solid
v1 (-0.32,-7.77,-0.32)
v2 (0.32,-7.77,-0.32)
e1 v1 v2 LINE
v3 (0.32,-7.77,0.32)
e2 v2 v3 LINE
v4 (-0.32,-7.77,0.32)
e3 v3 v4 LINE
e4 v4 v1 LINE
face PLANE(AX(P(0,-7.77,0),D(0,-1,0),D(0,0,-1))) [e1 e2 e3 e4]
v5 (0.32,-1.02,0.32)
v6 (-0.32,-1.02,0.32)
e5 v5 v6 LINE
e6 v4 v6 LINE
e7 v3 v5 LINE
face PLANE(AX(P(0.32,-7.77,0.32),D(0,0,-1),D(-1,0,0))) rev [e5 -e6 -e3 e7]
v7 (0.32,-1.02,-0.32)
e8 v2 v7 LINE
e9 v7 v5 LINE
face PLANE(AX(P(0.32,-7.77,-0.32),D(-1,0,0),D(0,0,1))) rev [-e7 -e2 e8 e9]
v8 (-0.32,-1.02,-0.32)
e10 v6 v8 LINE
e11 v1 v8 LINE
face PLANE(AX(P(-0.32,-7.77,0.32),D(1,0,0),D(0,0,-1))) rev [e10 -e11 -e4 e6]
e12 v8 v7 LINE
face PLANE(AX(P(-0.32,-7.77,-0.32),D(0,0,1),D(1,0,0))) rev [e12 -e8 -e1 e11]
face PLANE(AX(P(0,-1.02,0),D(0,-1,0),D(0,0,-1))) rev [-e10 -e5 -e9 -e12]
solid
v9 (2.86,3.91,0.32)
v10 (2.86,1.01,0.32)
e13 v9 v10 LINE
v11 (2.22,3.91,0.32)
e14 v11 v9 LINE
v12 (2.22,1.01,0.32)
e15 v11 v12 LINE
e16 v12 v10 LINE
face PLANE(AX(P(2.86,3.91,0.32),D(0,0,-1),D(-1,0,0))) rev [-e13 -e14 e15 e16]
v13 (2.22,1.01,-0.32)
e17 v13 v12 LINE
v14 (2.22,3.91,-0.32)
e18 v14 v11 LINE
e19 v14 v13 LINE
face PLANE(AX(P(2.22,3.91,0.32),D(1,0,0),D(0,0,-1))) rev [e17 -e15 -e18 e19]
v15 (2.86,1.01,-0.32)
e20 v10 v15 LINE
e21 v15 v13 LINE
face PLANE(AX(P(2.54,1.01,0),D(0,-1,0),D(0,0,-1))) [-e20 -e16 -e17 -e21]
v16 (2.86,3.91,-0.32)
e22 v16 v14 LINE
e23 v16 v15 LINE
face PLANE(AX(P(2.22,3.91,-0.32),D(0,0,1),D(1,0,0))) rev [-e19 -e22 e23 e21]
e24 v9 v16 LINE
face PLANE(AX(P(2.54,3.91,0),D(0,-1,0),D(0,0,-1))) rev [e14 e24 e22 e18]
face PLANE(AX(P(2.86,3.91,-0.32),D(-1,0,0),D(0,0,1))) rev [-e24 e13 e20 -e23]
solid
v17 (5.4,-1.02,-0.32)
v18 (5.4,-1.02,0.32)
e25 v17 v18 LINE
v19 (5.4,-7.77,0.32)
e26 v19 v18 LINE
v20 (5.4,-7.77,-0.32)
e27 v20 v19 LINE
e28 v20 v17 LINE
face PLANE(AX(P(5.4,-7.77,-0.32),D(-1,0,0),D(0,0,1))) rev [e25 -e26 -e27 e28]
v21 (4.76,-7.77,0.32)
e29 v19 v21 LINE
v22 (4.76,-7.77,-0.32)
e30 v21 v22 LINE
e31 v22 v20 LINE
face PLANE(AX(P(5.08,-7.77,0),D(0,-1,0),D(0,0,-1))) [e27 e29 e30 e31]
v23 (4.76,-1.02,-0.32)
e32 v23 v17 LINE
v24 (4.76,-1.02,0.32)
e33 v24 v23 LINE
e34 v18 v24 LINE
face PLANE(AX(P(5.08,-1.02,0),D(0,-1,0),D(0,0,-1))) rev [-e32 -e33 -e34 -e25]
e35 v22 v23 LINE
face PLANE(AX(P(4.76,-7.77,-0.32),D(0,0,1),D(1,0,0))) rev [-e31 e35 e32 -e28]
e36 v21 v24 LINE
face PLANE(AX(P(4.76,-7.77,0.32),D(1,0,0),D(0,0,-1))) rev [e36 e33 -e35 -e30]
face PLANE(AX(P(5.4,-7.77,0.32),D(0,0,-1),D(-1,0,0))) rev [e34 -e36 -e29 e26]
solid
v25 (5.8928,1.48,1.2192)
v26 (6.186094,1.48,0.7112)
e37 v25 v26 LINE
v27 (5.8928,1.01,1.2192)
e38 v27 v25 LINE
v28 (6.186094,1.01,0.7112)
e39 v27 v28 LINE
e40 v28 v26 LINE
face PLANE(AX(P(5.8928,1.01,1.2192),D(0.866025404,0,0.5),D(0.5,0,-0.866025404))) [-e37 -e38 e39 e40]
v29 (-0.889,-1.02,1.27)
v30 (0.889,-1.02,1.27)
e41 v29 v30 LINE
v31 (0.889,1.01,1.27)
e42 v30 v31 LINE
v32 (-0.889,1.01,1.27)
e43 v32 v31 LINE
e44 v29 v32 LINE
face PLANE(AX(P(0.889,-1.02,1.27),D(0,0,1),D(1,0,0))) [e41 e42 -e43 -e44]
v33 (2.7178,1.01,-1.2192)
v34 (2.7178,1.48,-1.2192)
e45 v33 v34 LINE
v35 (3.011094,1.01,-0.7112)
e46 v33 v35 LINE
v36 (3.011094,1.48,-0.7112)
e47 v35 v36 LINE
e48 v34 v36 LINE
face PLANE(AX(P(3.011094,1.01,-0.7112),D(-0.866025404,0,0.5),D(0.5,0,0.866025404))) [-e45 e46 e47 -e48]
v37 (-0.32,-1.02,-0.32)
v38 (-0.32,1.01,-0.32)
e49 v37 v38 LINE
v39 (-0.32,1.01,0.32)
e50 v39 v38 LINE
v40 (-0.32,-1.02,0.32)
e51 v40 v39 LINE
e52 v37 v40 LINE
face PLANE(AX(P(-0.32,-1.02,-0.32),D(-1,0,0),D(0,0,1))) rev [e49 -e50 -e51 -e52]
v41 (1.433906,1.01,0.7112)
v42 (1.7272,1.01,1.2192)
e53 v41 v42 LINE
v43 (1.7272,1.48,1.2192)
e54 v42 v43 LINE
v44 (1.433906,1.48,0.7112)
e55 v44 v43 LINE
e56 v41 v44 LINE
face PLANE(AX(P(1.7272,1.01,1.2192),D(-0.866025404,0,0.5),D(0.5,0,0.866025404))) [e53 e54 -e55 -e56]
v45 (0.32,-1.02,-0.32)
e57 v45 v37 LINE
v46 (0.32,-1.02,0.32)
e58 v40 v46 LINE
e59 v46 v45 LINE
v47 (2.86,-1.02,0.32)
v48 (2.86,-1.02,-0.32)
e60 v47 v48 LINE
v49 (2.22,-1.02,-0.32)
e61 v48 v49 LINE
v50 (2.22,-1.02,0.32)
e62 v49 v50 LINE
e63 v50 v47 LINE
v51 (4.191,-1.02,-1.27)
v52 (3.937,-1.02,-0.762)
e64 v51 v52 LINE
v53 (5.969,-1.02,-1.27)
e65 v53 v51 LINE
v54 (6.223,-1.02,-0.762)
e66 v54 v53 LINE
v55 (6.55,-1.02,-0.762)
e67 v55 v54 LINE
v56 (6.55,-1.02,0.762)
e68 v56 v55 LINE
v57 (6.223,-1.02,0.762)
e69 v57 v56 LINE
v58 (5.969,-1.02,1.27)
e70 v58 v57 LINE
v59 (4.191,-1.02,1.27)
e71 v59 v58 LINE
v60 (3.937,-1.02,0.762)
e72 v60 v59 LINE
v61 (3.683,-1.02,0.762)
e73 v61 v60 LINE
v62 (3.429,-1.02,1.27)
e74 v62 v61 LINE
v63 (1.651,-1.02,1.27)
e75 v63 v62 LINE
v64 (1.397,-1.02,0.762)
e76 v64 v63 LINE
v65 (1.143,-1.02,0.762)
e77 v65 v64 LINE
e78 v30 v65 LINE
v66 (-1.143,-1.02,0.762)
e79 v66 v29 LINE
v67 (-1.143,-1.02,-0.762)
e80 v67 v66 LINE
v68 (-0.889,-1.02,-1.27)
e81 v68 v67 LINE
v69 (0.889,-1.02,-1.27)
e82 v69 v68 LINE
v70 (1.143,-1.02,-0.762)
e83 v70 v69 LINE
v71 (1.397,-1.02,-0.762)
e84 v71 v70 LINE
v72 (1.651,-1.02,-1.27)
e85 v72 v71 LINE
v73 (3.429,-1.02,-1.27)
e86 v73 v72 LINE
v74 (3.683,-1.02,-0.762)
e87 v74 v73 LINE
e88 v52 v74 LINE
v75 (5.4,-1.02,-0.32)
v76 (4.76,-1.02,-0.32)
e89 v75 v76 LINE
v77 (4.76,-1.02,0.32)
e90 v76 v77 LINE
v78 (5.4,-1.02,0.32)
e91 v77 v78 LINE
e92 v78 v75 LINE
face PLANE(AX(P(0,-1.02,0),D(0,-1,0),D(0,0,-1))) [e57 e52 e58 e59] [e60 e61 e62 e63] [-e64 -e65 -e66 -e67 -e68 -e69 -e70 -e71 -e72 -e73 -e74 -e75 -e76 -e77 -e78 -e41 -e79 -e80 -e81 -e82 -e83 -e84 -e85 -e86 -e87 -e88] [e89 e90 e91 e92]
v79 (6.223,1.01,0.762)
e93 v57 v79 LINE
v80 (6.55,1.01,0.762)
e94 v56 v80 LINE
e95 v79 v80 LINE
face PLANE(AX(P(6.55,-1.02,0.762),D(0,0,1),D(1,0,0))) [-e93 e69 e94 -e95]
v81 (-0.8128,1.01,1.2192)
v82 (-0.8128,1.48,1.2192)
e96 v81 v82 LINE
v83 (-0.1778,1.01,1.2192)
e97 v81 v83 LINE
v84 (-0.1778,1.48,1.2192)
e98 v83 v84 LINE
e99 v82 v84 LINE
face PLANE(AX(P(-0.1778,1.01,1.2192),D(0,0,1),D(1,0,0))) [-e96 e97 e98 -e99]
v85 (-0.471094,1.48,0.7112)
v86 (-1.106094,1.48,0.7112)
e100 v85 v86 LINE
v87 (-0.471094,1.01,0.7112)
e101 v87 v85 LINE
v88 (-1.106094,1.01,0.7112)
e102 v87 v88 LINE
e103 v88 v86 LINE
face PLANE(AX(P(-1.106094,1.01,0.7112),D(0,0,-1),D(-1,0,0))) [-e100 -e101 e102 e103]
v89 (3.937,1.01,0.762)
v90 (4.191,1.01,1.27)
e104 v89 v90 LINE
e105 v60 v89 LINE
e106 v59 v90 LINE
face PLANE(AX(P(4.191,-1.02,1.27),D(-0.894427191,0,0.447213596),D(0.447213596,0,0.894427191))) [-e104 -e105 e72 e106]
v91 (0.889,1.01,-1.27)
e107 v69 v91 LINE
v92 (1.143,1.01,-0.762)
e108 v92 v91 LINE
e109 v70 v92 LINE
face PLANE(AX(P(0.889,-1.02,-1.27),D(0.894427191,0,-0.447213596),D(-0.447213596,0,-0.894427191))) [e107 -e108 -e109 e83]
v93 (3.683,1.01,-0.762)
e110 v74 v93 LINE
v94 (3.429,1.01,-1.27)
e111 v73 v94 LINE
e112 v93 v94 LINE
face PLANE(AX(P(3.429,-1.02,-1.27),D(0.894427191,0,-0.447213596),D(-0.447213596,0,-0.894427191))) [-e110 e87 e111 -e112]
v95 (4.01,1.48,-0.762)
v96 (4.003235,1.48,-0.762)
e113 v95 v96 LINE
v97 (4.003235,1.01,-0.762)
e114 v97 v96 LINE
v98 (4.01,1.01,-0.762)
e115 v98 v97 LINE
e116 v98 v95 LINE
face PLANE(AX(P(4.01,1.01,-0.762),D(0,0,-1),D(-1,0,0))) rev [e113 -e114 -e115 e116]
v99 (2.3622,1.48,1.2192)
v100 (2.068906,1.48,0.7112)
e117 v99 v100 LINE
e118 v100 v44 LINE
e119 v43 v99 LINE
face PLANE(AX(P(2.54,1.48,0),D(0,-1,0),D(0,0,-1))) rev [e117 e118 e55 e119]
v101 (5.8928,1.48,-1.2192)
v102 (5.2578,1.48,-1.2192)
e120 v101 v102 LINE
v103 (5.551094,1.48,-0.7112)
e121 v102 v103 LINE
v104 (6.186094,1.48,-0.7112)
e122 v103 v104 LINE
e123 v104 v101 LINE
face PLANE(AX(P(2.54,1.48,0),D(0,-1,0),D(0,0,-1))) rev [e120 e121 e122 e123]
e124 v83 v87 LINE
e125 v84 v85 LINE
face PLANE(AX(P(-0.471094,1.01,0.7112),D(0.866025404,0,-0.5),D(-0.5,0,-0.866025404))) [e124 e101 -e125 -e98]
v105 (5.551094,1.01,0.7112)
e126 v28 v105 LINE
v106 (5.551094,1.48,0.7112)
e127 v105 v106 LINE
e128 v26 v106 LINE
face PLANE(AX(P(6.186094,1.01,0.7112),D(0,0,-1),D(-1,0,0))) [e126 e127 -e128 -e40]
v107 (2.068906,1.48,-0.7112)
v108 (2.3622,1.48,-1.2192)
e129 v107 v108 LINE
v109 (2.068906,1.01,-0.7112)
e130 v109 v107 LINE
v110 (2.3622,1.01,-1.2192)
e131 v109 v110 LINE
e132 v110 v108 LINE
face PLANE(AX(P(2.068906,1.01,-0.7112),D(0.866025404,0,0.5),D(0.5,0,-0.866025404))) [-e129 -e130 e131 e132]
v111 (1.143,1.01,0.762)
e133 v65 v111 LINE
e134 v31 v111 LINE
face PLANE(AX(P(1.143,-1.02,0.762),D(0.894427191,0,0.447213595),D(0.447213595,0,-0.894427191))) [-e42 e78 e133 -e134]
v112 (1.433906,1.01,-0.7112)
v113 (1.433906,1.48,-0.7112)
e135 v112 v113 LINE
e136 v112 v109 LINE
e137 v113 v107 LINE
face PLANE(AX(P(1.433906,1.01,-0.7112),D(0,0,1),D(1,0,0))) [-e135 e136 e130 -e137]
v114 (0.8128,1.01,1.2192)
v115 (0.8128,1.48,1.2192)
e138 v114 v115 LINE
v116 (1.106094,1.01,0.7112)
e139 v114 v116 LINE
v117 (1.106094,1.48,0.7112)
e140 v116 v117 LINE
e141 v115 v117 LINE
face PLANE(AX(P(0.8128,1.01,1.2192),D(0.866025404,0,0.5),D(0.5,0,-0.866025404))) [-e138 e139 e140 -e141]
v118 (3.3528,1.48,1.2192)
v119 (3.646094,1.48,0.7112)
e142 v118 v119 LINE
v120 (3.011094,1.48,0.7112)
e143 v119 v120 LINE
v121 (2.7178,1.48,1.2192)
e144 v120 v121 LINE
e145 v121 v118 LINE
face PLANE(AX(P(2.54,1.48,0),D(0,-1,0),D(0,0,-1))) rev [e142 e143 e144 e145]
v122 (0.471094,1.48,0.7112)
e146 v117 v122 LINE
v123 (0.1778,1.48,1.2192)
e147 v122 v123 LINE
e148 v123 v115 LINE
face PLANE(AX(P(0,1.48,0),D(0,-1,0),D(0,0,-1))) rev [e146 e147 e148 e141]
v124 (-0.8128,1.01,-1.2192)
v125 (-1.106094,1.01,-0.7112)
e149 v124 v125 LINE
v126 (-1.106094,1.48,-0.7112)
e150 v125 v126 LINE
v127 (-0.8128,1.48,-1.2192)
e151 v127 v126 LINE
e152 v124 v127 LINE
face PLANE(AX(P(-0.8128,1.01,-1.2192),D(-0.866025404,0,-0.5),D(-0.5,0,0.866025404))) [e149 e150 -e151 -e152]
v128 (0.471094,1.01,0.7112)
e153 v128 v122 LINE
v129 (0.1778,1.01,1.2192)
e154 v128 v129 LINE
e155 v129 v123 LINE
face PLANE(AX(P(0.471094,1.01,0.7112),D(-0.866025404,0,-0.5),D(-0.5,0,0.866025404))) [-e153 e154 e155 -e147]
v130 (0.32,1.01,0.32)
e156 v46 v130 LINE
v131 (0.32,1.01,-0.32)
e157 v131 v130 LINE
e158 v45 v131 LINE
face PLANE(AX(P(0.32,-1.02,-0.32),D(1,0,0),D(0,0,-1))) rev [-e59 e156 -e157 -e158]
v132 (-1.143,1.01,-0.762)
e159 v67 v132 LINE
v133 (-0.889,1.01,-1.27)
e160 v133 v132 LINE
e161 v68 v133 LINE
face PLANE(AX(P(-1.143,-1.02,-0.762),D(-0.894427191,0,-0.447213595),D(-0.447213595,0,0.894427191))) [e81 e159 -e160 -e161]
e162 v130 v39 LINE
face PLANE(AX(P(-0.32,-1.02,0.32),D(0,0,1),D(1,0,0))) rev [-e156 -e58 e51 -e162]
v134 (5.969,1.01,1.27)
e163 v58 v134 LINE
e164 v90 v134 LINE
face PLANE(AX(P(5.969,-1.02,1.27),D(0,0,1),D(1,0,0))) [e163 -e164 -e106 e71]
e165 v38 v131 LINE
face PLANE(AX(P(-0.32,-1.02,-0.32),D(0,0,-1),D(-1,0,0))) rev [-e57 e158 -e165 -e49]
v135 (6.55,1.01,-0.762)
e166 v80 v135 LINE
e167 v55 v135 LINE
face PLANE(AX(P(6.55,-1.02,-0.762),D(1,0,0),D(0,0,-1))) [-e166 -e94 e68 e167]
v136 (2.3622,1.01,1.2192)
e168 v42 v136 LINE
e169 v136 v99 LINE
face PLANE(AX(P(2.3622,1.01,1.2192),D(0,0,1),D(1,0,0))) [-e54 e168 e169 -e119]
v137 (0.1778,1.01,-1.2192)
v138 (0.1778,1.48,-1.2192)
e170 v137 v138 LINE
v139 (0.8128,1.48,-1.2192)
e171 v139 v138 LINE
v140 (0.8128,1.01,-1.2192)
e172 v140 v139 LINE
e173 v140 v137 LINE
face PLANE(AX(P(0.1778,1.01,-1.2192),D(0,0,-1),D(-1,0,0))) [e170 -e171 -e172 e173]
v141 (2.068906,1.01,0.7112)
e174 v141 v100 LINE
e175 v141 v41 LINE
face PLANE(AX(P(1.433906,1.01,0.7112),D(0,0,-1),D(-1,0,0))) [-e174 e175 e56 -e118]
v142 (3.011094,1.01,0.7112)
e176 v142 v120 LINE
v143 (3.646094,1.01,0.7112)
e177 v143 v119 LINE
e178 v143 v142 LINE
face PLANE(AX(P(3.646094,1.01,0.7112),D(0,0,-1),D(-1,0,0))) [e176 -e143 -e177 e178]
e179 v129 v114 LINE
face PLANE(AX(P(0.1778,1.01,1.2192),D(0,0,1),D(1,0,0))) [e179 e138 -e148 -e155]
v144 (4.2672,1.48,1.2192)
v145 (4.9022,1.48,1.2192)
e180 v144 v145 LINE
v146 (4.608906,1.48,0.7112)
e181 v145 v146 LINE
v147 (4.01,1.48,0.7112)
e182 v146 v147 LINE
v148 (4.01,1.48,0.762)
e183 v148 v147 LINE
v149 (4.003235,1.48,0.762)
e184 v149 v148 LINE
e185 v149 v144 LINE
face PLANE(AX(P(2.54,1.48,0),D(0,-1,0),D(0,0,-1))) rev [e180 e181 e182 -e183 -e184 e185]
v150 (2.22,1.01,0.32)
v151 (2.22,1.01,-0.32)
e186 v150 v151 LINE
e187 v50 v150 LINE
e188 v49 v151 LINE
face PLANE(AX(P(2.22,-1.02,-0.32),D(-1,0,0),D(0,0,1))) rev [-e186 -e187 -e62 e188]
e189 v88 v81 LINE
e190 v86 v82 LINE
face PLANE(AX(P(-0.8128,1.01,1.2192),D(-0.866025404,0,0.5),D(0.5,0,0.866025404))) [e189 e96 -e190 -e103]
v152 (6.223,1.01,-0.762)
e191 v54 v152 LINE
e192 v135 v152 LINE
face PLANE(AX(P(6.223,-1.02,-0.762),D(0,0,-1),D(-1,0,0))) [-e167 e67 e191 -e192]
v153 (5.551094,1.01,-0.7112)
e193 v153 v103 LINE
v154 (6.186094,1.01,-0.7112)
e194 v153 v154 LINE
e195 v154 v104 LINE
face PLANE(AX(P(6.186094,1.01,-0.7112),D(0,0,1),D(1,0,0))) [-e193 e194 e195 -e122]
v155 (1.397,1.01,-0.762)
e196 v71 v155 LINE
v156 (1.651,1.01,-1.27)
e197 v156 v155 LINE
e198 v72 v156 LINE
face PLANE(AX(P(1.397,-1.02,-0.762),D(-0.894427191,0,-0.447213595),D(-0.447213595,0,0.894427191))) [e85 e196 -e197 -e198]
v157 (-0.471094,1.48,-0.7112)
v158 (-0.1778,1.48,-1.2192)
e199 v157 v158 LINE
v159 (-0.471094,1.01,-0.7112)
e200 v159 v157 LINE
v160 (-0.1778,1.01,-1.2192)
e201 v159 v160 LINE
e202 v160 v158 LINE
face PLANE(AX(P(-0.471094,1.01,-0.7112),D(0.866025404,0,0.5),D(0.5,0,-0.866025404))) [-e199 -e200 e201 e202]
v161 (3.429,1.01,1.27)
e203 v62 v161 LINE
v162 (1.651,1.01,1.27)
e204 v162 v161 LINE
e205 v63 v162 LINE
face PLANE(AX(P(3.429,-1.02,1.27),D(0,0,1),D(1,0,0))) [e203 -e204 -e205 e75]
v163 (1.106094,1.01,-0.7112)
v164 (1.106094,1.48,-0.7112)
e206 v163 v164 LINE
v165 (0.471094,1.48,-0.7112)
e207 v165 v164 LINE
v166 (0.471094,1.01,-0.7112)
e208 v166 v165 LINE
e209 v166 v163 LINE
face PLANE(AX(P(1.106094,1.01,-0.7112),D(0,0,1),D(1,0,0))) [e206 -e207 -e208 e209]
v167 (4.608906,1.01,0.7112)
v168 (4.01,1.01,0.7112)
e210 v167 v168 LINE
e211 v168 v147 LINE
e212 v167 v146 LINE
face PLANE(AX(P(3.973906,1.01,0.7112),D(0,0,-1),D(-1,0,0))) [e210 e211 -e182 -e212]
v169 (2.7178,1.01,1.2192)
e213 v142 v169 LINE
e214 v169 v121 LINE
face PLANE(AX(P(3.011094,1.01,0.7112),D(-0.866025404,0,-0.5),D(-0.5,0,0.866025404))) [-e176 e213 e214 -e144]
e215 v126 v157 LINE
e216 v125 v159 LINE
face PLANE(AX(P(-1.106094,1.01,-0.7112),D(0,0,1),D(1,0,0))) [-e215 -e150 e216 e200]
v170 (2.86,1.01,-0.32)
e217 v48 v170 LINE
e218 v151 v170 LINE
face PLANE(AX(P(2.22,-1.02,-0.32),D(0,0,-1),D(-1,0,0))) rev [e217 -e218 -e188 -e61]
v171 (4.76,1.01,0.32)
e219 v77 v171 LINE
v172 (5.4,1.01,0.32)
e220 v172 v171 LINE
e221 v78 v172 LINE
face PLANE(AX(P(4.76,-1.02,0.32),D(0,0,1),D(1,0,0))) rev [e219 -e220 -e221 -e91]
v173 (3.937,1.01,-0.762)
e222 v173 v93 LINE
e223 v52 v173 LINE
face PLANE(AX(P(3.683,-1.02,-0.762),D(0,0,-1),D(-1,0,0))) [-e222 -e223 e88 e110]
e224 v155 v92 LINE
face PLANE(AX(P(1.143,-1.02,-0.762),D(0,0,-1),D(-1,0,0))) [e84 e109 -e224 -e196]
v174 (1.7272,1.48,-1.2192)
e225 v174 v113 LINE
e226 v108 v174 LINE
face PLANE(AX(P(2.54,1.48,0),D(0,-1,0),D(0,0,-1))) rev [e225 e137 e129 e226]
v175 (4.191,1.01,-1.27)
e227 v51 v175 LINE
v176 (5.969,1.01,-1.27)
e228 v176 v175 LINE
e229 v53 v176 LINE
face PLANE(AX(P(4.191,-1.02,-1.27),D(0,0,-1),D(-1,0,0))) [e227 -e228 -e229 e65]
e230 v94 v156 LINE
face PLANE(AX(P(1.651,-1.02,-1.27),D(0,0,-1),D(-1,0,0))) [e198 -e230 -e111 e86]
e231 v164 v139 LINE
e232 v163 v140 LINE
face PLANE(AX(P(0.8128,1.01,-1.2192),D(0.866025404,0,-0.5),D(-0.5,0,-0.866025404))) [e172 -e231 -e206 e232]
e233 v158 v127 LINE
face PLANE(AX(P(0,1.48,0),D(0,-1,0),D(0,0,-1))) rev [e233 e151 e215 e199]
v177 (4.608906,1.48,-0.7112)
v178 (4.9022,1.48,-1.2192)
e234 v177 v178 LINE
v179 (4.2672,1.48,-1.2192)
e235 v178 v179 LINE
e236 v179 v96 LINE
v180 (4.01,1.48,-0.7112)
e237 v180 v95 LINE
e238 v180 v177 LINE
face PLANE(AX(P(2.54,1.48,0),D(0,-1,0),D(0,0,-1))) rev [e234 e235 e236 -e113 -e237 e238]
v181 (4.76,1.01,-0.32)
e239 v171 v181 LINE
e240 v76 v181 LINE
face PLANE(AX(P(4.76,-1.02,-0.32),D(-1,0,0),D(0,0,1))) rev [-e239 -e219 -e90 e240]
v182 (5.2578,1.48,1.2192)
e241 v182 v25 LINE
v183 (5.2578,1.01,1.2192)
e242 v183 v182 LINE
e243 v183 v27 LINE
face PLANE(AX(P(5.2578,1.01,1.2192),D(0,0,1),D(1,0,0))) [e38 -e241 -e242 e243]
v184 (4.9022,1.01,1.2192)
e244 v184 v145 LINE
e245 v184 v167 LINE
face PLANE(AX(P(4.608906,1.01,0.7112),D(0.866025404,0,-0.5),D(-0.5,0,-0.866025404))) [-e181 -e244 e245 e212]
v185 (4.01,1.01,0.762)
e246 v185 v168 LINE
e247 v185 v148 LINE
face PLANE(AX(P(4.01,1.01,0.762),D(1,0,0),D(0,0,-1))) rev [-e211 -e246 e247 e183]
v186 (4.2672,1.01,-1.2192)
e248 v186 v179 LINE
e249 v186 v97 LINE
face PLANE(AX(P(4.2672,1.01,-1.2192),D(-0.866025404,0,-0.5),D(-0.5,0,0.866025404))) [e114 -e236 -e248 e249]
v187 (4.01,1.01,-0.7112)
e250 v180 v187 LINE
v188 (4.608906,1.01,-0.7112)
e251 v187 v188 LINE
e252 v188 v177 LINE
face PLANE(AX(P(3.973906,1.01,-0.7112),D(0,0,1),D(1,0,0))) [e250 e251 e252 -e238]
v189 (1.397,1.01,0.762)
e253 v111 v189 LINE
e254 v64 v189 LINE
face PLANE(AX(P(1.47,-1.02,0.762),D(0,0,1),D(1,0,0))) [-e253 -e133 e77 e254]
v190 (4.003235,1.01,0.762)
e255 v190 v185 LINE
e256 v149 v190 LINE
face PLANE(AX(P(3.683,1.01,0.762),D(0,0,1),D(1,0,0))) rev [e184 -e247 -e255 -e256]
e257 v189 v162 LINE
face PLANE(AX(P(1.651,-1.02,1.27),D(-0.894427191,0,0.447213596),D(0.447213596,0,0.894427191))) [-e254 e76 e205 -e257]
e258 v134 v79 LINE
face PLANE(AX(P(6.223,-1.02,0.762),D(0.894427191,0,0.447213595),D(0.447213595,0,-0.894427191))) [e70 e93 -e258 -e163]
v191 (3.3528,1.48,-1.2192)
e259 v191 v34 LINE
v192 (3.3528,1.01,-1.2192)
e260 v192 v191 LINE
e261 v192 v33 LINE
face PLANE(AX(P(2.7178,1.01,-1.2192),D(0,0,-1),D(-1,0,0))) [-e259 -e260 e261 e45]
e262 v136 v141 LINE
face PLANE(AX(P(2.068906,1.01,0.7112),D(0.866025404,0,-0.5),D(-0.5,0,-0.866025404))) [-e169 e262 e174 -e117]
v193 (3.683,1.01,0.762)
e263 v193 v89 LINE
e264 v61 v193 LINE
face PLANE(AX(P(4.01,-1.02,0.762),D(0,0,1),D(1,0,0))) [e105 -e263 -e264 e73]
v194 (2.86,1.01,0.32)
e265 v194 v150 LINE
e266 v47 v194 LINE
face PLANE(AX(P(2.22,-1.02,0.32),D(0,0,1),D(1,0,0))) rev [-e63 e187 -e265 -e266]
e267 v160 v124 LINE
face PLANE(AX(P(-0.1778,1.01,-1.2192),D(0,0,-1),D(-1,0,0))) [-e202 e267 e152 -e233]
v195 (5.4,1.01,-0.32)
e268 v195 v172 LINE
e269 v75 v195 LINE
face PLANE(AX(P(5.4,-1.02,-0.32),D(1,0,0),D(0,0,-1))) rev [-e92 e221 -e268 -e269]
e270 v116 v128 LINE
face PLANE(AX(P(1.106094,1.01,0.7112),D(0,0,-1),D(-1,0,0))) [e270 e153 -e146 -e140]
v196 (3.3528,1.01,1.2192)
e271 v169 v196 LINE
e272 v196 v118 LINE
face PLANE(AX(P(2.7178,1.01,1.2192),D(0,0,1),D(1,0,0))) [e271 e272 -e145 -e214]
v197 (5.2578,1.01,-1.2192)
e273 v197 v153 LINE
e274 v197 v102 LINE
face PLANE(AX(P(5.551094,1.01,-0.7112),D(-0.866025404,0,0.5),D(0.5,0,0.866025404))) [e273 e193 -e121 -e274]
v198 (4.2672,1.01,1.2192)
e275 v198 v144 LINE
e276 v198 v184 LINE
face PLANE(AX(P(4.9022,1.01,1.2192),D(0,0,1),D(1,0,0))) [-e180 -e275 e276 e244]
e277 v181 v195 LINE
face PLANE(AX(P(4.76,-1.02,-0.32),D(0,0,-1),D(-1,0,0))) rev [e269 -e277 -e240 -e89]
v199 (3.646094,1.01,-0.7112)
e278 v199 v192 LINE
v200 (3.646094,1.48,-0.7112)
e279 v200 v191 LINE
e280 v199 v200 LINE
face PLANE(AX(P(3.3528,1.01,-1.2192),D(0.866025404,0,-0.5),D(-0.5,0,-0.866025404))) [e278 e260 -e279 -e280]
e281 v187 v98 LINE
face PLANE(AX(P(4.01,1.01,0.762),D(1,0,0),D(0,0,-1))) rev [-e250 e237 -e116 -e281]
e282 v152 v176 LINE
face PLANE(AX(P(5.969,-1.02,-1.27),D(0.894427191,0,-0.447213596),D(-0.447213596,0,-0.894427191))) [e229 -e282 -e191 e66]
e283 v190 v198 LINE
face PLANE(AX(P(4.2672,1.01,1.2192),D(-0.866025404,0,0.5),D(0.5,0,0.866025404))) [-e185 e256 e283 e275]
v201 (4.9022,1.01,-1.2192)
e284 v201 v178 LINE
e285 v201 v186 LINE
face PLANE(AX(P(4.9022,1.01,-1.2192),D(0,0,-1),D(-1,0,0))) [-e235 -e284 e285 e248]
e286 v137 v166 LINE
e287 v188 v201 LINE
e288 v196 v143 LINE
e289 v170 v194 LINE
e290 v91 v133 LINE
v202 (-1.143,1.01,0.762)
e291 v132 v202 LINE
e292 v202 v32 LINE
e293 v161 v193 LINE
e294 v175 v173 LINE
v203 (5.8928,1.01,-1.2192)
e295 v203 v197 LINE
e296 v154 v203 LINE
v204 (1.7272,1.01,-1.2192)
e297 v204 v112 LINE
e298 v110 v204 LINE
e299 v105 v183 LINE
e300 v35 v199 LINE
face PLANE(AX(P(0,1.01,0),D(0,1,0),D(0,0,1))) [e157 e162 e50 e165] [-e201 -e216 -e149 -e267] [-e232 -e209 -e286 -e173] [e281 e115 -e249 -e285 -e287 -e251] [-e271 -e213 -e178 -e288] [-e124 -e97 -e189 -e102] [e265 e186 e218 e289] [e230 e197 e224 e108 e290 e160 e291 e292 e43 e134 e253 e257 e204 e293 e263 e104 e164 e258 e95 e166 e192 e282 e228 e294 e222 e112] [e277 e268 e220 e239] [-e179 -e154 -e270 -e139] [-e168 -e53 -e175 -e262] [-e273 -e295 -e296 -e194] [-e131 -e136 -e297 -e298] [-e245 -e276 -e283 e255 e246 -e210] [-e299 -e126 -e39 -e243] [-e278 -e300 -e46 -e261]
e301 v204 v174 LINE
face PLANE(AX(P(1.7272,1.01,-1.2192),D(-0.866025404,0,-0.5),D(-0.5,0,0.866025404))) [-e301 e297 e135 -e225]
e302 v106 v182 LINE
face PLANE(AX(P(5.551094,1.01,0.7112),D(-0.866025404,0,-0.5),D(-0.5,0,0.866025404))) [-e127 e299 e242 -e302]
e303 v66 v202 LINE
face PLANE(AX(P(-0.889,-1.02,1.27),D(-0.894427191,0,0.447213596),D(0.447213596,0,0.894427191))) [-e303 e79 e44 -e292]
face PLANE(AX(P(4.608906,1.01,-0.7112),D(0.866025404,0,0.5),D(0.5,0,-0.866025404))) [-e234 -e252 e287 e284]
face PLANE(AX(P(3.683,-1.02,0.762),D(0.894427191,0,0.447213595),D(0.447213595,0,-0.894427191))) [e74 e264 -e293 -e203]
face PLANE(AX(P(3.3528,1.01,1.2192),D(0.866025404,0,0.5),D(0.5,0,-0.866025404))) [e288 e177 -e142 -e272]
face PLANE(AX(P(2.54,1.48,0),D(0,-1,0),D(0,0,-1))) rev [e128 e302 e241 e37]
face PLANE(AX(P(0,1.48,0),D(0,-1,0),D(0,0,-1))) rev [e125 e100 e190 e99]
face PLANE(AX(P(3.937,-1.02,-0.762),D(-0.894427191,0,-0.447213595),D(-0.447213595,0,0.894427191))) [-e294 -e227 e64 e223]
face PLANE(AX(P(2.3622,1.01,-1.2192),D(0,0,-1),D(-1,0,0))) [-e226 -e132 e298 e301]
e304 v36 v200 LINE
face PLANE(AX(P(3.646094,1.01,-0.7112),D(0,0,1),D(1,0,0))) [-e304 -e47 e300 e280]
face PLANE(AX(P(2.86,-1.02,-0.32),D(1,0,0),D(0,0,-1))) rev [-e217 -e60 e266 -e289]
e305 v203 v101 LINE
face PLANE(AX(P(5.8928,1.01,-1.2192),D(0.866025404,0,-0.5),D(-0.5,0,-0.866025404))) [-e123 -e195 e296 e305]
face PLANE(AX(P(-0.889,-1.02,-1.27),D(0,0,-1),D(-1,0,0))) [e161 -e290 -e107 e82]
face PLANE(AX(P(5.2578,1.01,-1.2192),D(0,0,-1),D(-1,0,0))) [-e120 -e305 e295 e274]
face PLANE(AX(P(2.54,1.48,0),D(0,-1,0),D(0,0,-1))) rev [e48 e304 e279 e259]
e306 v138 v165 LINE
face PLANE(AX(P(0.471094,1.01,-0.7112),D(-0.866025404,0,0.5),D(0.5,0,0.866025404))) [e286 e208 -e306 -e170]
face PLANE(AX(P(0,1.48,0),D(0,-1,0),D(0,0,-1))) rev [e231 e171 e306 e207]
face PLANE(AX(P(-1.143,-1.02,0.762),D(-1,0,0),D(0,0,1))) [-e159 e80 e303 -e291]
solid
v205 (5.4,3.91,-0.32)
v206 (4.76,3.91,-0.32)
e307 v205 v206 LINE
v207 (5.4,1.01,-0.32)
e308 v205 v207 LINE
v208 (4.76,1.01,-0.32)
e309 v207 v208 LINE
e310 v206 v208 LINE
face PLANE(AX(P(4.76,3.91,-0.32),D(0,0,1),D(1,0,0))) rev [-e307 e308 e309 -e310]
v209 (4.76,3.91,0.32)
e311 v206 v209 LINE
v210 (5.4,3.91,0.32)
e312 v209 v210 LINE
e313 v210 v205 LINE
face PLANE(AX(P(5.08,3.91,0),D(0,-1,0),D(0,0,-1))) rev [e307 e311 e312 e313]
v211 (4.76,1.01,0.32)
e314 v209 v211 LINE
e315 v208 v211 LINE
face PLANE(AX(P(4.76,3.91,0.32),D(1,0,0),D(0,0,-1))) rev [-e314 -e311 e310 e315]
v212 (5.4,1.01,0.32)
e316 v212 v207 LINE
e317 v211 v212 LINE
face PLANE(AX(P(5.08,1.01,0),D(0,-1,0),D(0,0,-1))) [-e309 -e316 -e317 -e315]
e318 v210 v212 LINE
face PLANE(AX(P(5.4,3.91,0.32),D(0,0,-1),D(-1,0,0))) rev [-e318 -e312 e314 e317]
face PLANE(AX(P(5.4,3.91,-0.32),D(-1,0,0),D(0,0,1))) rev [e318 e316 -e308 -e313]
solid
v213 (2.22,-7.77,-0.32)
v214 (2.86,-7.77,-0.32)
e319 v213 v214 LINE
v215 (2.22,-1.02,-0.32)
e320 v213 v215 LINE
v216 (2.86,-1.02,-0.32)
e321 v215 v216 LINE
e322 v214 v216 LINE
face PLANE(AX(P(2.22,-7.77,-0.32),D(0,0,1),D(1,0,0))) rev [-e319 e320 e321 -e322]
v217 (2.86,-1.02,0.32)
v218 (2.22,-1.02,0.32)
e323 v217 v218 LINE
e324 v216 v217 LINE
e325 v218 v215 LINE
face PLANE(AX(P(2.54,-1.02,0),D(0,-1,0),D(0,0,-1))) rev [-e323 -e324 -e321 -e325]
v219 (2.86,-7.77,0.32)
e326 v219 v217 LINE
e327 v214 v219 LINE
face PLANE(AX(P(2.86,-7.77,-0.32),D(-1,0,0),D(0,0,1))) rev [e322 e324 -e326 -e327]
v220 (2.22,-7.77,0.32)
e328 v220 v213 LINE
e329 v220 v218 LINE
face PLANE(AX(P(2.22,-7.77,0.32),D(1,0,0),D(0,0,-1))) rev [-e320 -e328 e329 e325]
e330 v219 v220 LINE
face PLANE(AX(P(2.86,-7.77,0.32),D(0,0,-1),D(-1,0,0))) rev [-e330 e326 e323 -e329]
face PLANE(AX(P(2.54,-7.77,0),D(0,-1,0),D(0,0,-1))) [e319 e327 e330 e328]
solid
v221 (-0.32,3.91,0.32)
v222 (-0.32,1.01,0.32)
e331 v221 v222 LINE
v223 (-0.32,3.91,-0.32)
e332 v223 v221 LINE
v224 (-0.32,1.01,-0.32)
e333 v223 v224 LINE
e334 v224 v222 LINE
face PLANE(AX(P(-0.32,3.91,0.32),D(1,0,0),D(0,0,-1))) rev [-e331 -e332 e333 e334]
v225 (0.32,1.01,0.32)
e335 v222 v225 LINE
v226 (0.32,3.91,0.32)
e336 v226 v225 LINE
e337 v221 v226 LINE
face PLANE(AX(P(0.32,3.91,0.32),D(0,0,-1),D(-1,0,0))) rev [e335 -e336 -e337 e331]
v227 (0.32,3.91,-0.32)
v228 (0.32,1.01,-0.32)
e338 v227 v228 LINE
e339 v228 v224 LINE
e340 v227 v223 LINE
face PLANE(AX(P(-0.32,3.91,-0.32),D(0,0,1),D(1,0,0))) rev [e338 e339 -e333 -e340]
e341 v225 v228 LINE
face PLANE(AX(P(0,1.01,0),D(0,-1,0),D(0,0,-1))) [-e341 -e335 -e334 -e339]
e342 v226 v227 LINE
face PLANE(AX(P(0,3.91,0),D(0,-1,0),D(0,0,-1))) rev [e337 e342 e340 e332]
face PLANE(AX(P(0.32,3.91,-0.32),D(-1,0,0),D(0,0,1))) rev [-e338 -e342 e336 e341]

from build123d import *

# Parameters (mm, degrees)
BOSS_EXTRUDE1_START = -1.02
SKETCH1_W           = 0.64
SKETCH1_H           = 0.64
BOSS_EXTRUDE1_DEPTH = 2.5
CUT_EXTRUDE2_DEPTH  = 0.47
SKETCH3_W           = 0.64
SKETCH3_H           = 0.64
BOSS_EXTRUDE2_DEPTH = 2.9
SKETCH4_W           = 0.64
SKETCH4_H           = 0.64
BOSS_EXTRUDE3_DEPTH = 6.75
LPATTERN1_COUNT     = 3
LPATTERN1_PITCH     = 2.54


with BuildPart() as part:
    # Sketch1 → Boss-Extrude1 (new body)
    with BuildSketch(Plane(origin=(0, 0, 0), x_dir=(1, 0, 0), z_dir=(0, 1, 0)).offset(BOSS_EXTRUDE1_START)):
        Polygon((-1.143, 0.762), (-0.889, 1.27), (0.889, 1.27), (1.143, 0.762), (1.47, 0.762), (1.47, -0.762), (1.143, -0.762), (0.889, -1.27), (-0.889, -1.27), (-1.143, -0.762), align=None)
        Rectangle(SKETCH1_W, SKETCH1_H, mode=Mode.SUBTRACT)
    boss_extrude1 = extrude(amount=BOSS_EXTRUDE1_DEPTH)

    # Sketch2 → Cut-Extrude2 (cut)
    with BuildSketch(Plane(origin=(0, 1.48, 0), x_dir=(1, 0, 0), z_dir=(0, 1, 0))):
        Polygon((-1.143, 0.762), (-1.143, -0.762), (-0.889, -1.27), (0.889, -1.27), (1.143, -0.762), (1.47, -0.762), (1.47, 0.762), (1.143, 0.762), (0.889, 1.27), (-0.889, 1.27), align=None)
        Polygon((-1.106093937, -0.7112), (-0.471093937, -0.7112), (-0.1778, -1.2192), (-0.8128, -1.2192), align=None, mode=Mode.SUBTRACT)
        Polygon((-0.8128, 1.2192), (-1.106093937, 0.7112), (-0.471093937, 0.7112), (-0.1778, 1.2192), align=None, mode=Mode.SUBTRACT)
        Polygon((1.106093937, 0.7112), (0.471093937, 0.7112), (0.1778, 1.2192), (0.8128, 1.2192), align=None, mode=Mode.SUBTRACT)
        Polygon((0.8128, -1.2192), (1.106093937, -0.7112), (0.471093937, -0.7112), (0.1778, -1.2192), align=None, mode=Mode.SUBTRACT)
    cut_extrude2 = extrude(amount=-CUT_EXTRUDE2_DEPTH, mode=Mode.SUBTRACT)


with BuildPart() as body_2:
    # Sketch3 → Boss-Extrude2 (new body)
    with BuildSketch(Plane(origin=(0, 1.01, 0), x_dir=(1, 0, 0), z_dir=(0, 1, 0))):
        Rectangle(SKETCH3_W, SKETCH3_H)
    boss_extrude2 = extrude(amount=BOSS_EXTRUDE2_DEPTH)


with BuildPart() as body_3:
    # Sketch4 → Boss-Extrude3 (new body)
    with BuildSketch(Plane.XZ.offset(1.02)):
        Rectangle(SKETCH4_W, SKETCH4_H)
    boss_extrude3 = extrude(amount=BOSS_EXTRUDE3_DEPTH)


with BuildPart() as part_1:
    add(part.part)

    # LPattern1: Boss-Extrude1, Cut-Extrude2, Boss-Extrude2, Boss-Extrude3 ×3
    with Locations(*[(i * LPATTERN1_PITCH, 0, 0) for i in range(1, LPATTERN1_COUNT)]):
        add(boss_extrude1)
        add(cut_extrude2, mode=Mode.SUBTRACT)
        add(boss_extrude2)
        add(boss_extrude3)


solid = Compound([body_2.part, body_3.part, part_1.part])
